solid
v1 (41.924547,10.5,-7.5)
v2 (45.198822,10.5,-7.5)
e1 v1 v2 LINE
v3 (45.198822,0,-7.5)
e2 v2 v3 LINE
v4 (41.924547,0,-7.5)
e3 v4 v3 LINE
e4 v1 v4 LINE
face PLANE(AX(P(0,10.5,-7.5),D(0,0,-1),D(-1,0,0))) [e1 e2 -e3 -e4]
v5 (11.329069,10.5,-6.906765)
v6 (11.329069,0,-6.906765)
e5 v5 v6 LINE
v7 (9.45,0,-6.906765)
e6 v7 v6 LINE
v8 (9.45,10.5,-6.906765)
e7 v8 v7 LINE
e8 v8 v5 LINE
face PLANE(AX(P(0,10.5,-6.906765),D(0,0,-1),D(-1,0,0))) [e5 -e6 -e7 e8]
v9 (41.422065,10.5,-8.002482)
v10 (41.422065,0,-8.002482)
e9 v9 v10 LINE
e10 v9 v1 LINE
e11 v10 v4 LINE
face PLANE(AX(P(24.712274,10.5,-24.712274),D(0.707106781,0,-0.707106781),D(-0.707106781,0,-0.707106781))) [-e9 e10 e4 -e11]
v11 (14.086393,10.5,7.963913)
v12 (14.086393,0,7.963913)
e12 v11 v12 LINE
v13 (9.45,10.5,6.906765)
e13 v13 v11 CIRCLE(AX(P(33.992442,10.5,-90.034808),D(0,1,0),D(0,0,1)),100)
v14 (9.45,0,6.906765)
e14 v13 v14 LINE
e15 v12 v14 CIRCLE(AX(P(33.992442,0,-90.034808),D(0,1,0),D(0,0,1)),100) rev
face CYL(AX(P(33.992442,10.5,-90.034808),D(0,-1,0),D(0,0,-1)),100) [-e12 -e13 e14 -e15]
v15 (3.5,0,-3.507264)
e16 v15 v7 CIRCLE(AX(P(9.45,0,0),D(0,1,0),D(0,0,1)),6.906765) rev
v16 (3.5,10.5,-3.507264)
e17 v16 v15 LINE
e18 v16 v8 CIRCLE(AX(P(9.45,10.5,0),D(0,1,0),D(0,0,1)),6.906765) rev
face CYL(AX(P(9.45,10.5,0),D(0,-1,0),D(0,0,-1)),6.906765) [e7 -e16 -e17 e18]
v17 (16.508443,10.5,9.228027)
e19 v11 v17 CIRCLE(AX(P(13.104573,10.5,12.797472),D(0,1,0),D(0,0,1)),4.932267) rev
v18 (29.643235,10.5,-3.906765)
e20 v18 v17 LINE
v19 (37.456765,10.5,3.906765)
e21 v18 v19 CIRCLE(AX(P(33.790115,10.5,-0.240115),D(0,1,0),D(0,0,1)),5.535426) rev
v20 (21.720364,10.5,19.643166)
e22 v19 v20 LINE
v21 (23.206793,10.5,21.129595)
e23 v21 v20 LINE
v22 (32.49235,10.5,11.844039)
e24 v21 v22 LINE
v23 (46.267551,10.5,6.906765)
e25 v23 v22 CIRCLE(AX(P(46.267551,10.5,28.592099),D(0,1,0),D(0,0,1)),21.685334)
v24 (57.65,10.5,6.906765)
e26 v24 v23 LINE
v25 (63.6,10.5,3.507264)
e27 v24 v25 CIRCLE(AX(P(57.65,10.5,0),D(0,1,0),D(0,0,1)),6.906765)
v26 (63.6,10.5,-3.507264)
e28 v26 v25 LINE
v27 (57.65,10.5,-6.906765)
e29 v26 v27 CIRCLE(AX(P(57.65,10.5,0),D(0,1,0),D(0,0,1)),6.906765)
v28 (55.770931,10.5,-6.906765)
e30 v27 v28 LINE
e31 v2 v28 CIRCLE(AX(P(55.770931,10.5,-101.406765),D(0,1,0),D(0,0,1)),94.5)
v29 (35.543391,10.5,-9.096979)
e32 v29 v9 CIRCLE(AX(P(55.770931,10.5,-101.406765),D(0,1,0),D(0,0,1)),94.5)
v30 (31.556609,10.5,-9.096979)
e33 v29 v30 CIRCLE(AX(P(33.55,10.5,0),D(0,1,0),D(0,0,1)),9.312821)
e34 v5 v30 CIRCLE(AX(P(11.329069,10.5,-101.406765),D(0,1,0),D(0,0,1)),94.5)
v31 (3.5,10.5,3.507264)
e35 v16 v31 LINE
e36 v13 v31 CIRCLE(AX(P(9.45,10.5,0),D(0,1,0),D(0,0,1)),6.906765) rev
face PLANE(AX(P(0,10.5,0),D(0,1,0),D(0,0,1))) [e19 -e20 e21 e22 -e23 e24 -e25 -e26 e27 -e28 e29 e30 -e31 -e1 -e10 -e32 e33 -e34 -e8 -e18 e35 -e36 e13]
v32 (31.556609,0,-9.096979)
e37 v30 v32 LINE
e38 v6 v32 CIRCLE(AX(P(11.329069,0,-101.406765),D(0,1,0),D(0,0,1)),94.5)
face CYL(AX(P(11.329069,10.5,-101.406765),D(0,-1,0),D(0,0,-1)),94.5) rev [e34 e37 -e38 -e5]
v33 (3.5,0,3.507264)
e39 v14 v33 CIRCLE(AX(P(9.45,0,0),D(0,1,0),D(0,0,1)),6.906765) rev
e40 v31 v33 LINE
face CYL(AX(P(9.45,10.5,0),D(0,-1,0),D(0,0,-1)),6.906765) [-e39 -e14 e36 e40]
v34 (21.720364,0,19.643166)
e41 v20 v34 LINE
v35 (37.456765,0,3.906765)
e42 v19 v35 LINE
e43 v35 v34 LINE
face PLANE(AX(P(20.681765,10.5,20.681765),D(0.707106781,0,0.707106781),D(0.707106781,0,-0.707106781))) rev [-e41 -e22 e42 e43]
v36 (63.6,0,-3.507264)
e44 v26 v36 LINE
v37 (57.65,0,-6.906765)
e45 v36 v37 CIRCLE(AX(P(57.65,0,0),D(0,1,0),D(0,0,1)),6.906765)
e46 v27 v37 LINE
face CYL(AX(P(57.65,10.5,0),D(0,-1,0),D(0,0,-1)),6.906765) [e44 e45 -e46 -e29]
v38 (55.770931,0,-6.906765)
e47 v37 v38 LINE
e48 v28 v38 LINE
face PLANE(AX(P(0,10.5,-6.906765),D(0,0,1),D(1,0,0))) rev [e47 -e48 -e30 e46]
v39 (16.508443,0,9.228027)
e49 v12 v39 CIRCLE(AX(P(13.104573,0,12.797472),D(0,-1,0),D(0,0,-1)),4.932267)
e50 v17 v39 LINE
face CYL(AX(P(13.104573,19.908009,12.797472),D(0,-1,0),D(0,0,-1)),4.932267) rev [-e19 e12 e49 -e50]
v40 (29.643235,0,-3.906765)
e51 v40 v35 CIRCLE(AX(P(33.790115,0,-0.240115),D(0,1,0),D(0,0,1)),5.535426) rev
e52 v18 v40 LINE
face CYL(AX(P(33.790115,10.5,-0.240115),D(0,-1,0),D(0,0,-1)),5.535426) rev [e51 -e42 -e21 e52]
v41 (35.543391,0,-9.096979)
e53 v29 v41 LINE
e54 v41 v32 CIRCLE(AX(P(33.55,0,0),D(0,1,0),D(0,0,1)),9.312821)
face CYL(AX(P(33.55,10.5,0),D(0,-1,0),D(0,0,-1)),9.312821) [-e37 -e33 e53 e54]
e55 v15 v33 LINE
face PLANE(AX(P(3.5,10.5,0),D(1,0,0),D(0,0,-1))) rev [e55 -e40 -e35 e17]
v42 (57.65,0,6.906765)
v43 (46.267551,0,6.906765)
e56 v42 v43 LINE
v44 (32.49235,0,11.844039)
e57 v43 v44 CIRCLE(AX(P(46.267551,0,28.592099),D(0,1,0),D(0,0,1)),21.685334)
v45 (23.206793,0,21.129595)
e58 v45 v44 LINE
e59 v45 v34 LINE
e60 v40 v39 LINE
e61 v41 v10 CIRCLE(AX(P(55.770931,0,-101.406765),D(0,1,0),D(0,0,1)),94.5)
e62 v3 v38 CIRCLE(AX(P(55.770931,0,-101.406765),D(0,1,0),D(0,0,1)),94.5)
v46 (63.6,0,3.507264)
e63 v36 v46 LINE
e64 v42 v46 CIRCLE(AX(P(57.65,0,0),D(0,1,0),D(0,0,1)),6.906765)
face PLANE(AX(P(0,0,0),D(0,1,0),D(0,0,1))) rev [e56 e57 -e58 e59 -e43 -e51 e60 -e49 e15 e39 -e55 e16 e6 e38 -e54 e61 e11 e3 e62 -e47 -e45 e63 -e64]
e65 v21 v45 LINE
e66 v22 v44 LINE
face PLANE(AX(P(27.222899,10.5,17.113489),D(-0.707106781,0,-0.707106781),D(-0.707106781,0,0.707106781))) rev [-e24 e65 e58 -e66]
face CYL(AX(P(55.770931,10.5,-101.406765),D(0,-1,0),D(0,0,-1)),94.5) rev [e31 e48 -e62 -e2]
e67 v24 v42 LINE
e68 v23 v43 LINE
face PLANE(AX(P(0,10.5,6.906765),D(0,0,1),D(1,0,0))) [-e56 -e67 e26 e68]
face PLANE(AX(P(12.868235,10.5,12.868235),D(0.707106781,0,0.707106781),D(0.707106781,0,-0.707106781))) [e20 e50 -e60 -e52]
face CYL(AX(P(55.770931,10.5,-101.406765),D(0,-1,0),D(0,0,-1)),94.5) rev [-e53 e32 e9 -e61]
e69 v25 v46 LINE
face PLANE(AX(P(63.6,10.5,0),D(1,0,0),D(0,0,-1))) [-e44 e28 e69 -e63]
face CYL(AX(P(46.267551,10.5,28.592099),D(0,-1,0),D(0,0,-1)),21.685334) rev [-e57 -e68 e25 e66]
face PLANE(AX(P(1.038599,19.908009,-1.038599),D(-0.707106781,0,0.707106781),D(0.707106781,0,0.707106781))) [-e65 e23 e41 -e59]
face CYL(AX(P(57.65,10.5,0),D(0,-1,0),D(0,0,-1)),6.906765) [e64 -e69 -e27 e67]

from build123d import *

# Parameters (mm, degrees)
BOSS_EXTRUDE2_DEPTH = 10.5
BOSS_EXTRUDE3_DEPTH = 10.5
FILLET1_R           = 100


with BuildPart() as part:
    # Sketch1 → Boss-Extrude2 (new body)
    with BuildSketch(Plane(origin=(0, 0, 0), x_dir=(1, 0, 0), z_dir=(0, 1, 0))):
        with BuildLine():
            Line((3.5, 3.507264218), (3.5, -3.507264218))
            ThreePointArc((3.5, -3.507264218), (6.023664299, -5.996968064), (9.45, -6.906764966))
            ThreePointArc((9.45, -6.906764966), (13.341155227, -5.869242314), (17.152471347, -7.169785158))
            ThreePointArc((17.152471347, -7.169785158), (17.367404774, -7.330790599), (17.575940883, -7.5))
            Line((17.575940883, -7.5), (18.236470068, -7.5))
            Line((18.236470068, -7.5), (29.643235034, 3.906764966))
            ThreePointArc((29.643235034, 3.906764966), (37.704252339, 4.154252339), (37.456764966, -3.906764966))
            Line((37.456764966, -3.906764966), (25.736470068, -15.627059864))
            Line((25.736470068, -15.627059864), (27.222899263, -17.113489059))
            Line((27.222899263, -17.113489059), (32.492349737, -11.844038585))
            ThreePointArc((32.492349737, -11.844038585), (38.950911947, -8.178365919), (46.267551404, -6.906764966))
            Line((46.267551404, -6.906764966), (57.65, -6.906764966))
            ThreePointArc((57.65, -6.906764966), (61.076335701, -5.996968064), (63.6, -3.507264218))
            Line((63.6, -3.507264218), (63.6, 3.507264218))
            ThreePointArc((63.6, 3.507264218), (61.076335701, 5.996968064), (57.65, 6.906764966))
            Line((57.65, 6.906764966), (55.770931212, 6.906764966))
            ThreePointArc((55.770931212, 6.906764966), (50.476561055, 7.055190286), (45.19882198, 7.5))
            Line((45.19882198, 7.5), (41.924547238, 7.5))
            Line((41.924547238, 7.5), (41.422065041, 8.002482197))
            ThreePointArc((41.422065041, 8.002482197), (38.474068809, 8.503220626), (35.543391077, 9.09697881))
            ThreePointArc((35.543391077, 9.09697881), (33.55, 9.312820811), (31.556608923, 9.09697881))
            ThreePointArc((31.556608923, 9.09697881), (21.501954522, 7.455914007), (11.329068788, 6.906764966))
            Line((11.329068788, 6.906764966), (9.45, 6.906764966))
            ThreePointArc((9.45, 6.906764966), (6.023664299, 5.996968064), (3.5, 3.507264218))
        make_face()
    extrude(amount=BOSS_EXTRUDE2_DEPTH)

    # Sketch4 → Boss-Extrude3 (add)
    with BuildSketch(Plane.XZ):
        with BuildLine():
            ThreePointArc((17.575940883, 7.5), (17.752085177, 7.65383798), (17.922940136, 7.813529932))
            Line((17.922940136, 7.813529932), (16.508443005, 9.228027063))
            ThreePointArc((16.508443005, 9.228027063), (13.612622768, 7.891439794), (10.504365982, 8.606268534))
            Line((10.504365982, 8.606268534), (9.45, 6.906764966))
            ThreePointArc((9.45, 6.906764966), (13.609320969, 5.883604236), (17.575940883, 7.5))
        make_face()
        with BuildLine():
            Line((17.575940883, 7.5), (18.236470068, 7.5))
            Line((18.236470068, 7.5), (17.922940136, 7.813529932))
            ThreePointArc((17.922940136, 7.813529932), (17.752085177, 7.65383798), (17.575940883, 7.5))
        make_face()
        Polygon((21.720364105, 19.643165827), (25.736470068, 15.627059864), (26.69888256, 16.589472356), (27.222899263, 17.113489059), (23.2067933, 21.129595022), align=None)
    extrude(amount=-BOSS_EXTRUDE3_DEPTH)

    # Fillet1
    # the kernel refuses this fillet: 100 mm, written as the material it takes off along each edge
    with BuildSketch(Plane(origin=(10.504365982, -9.09791834, 8.606268534), x_dir=(0.9842985265929657, 0, -0.17651178585838628), z_dir=(0, 1, 0))) as fillet1_piece_1:
        with BuildLine():
            CenterArc((40.530590954, 92.946344003), FILLET1_R, 245.626436409, 2.724892596)
            Line((-0.737828472, 1.85892688), (-1.563196861, 0.037178538))
            ThreePointArc((-1.563196861, 0.037178538), (-2.227841116, 0.191634968), (-1.85892688, -0.737828472))
            Line((-1.85892688, -0.737828472), (0.737828472, -1.85892688))
            ThreePointArc((0.737828472, -1.85892688), (1.819583668, -1.652094823), (2.901338864, -1.85892688))
            Line((2.901338864, -1.85892688), (3.639167336, 0))
        make_face()
    extrude(amount=28.69583668, mode=Mode.SUBTRACT)


solid = part.part
